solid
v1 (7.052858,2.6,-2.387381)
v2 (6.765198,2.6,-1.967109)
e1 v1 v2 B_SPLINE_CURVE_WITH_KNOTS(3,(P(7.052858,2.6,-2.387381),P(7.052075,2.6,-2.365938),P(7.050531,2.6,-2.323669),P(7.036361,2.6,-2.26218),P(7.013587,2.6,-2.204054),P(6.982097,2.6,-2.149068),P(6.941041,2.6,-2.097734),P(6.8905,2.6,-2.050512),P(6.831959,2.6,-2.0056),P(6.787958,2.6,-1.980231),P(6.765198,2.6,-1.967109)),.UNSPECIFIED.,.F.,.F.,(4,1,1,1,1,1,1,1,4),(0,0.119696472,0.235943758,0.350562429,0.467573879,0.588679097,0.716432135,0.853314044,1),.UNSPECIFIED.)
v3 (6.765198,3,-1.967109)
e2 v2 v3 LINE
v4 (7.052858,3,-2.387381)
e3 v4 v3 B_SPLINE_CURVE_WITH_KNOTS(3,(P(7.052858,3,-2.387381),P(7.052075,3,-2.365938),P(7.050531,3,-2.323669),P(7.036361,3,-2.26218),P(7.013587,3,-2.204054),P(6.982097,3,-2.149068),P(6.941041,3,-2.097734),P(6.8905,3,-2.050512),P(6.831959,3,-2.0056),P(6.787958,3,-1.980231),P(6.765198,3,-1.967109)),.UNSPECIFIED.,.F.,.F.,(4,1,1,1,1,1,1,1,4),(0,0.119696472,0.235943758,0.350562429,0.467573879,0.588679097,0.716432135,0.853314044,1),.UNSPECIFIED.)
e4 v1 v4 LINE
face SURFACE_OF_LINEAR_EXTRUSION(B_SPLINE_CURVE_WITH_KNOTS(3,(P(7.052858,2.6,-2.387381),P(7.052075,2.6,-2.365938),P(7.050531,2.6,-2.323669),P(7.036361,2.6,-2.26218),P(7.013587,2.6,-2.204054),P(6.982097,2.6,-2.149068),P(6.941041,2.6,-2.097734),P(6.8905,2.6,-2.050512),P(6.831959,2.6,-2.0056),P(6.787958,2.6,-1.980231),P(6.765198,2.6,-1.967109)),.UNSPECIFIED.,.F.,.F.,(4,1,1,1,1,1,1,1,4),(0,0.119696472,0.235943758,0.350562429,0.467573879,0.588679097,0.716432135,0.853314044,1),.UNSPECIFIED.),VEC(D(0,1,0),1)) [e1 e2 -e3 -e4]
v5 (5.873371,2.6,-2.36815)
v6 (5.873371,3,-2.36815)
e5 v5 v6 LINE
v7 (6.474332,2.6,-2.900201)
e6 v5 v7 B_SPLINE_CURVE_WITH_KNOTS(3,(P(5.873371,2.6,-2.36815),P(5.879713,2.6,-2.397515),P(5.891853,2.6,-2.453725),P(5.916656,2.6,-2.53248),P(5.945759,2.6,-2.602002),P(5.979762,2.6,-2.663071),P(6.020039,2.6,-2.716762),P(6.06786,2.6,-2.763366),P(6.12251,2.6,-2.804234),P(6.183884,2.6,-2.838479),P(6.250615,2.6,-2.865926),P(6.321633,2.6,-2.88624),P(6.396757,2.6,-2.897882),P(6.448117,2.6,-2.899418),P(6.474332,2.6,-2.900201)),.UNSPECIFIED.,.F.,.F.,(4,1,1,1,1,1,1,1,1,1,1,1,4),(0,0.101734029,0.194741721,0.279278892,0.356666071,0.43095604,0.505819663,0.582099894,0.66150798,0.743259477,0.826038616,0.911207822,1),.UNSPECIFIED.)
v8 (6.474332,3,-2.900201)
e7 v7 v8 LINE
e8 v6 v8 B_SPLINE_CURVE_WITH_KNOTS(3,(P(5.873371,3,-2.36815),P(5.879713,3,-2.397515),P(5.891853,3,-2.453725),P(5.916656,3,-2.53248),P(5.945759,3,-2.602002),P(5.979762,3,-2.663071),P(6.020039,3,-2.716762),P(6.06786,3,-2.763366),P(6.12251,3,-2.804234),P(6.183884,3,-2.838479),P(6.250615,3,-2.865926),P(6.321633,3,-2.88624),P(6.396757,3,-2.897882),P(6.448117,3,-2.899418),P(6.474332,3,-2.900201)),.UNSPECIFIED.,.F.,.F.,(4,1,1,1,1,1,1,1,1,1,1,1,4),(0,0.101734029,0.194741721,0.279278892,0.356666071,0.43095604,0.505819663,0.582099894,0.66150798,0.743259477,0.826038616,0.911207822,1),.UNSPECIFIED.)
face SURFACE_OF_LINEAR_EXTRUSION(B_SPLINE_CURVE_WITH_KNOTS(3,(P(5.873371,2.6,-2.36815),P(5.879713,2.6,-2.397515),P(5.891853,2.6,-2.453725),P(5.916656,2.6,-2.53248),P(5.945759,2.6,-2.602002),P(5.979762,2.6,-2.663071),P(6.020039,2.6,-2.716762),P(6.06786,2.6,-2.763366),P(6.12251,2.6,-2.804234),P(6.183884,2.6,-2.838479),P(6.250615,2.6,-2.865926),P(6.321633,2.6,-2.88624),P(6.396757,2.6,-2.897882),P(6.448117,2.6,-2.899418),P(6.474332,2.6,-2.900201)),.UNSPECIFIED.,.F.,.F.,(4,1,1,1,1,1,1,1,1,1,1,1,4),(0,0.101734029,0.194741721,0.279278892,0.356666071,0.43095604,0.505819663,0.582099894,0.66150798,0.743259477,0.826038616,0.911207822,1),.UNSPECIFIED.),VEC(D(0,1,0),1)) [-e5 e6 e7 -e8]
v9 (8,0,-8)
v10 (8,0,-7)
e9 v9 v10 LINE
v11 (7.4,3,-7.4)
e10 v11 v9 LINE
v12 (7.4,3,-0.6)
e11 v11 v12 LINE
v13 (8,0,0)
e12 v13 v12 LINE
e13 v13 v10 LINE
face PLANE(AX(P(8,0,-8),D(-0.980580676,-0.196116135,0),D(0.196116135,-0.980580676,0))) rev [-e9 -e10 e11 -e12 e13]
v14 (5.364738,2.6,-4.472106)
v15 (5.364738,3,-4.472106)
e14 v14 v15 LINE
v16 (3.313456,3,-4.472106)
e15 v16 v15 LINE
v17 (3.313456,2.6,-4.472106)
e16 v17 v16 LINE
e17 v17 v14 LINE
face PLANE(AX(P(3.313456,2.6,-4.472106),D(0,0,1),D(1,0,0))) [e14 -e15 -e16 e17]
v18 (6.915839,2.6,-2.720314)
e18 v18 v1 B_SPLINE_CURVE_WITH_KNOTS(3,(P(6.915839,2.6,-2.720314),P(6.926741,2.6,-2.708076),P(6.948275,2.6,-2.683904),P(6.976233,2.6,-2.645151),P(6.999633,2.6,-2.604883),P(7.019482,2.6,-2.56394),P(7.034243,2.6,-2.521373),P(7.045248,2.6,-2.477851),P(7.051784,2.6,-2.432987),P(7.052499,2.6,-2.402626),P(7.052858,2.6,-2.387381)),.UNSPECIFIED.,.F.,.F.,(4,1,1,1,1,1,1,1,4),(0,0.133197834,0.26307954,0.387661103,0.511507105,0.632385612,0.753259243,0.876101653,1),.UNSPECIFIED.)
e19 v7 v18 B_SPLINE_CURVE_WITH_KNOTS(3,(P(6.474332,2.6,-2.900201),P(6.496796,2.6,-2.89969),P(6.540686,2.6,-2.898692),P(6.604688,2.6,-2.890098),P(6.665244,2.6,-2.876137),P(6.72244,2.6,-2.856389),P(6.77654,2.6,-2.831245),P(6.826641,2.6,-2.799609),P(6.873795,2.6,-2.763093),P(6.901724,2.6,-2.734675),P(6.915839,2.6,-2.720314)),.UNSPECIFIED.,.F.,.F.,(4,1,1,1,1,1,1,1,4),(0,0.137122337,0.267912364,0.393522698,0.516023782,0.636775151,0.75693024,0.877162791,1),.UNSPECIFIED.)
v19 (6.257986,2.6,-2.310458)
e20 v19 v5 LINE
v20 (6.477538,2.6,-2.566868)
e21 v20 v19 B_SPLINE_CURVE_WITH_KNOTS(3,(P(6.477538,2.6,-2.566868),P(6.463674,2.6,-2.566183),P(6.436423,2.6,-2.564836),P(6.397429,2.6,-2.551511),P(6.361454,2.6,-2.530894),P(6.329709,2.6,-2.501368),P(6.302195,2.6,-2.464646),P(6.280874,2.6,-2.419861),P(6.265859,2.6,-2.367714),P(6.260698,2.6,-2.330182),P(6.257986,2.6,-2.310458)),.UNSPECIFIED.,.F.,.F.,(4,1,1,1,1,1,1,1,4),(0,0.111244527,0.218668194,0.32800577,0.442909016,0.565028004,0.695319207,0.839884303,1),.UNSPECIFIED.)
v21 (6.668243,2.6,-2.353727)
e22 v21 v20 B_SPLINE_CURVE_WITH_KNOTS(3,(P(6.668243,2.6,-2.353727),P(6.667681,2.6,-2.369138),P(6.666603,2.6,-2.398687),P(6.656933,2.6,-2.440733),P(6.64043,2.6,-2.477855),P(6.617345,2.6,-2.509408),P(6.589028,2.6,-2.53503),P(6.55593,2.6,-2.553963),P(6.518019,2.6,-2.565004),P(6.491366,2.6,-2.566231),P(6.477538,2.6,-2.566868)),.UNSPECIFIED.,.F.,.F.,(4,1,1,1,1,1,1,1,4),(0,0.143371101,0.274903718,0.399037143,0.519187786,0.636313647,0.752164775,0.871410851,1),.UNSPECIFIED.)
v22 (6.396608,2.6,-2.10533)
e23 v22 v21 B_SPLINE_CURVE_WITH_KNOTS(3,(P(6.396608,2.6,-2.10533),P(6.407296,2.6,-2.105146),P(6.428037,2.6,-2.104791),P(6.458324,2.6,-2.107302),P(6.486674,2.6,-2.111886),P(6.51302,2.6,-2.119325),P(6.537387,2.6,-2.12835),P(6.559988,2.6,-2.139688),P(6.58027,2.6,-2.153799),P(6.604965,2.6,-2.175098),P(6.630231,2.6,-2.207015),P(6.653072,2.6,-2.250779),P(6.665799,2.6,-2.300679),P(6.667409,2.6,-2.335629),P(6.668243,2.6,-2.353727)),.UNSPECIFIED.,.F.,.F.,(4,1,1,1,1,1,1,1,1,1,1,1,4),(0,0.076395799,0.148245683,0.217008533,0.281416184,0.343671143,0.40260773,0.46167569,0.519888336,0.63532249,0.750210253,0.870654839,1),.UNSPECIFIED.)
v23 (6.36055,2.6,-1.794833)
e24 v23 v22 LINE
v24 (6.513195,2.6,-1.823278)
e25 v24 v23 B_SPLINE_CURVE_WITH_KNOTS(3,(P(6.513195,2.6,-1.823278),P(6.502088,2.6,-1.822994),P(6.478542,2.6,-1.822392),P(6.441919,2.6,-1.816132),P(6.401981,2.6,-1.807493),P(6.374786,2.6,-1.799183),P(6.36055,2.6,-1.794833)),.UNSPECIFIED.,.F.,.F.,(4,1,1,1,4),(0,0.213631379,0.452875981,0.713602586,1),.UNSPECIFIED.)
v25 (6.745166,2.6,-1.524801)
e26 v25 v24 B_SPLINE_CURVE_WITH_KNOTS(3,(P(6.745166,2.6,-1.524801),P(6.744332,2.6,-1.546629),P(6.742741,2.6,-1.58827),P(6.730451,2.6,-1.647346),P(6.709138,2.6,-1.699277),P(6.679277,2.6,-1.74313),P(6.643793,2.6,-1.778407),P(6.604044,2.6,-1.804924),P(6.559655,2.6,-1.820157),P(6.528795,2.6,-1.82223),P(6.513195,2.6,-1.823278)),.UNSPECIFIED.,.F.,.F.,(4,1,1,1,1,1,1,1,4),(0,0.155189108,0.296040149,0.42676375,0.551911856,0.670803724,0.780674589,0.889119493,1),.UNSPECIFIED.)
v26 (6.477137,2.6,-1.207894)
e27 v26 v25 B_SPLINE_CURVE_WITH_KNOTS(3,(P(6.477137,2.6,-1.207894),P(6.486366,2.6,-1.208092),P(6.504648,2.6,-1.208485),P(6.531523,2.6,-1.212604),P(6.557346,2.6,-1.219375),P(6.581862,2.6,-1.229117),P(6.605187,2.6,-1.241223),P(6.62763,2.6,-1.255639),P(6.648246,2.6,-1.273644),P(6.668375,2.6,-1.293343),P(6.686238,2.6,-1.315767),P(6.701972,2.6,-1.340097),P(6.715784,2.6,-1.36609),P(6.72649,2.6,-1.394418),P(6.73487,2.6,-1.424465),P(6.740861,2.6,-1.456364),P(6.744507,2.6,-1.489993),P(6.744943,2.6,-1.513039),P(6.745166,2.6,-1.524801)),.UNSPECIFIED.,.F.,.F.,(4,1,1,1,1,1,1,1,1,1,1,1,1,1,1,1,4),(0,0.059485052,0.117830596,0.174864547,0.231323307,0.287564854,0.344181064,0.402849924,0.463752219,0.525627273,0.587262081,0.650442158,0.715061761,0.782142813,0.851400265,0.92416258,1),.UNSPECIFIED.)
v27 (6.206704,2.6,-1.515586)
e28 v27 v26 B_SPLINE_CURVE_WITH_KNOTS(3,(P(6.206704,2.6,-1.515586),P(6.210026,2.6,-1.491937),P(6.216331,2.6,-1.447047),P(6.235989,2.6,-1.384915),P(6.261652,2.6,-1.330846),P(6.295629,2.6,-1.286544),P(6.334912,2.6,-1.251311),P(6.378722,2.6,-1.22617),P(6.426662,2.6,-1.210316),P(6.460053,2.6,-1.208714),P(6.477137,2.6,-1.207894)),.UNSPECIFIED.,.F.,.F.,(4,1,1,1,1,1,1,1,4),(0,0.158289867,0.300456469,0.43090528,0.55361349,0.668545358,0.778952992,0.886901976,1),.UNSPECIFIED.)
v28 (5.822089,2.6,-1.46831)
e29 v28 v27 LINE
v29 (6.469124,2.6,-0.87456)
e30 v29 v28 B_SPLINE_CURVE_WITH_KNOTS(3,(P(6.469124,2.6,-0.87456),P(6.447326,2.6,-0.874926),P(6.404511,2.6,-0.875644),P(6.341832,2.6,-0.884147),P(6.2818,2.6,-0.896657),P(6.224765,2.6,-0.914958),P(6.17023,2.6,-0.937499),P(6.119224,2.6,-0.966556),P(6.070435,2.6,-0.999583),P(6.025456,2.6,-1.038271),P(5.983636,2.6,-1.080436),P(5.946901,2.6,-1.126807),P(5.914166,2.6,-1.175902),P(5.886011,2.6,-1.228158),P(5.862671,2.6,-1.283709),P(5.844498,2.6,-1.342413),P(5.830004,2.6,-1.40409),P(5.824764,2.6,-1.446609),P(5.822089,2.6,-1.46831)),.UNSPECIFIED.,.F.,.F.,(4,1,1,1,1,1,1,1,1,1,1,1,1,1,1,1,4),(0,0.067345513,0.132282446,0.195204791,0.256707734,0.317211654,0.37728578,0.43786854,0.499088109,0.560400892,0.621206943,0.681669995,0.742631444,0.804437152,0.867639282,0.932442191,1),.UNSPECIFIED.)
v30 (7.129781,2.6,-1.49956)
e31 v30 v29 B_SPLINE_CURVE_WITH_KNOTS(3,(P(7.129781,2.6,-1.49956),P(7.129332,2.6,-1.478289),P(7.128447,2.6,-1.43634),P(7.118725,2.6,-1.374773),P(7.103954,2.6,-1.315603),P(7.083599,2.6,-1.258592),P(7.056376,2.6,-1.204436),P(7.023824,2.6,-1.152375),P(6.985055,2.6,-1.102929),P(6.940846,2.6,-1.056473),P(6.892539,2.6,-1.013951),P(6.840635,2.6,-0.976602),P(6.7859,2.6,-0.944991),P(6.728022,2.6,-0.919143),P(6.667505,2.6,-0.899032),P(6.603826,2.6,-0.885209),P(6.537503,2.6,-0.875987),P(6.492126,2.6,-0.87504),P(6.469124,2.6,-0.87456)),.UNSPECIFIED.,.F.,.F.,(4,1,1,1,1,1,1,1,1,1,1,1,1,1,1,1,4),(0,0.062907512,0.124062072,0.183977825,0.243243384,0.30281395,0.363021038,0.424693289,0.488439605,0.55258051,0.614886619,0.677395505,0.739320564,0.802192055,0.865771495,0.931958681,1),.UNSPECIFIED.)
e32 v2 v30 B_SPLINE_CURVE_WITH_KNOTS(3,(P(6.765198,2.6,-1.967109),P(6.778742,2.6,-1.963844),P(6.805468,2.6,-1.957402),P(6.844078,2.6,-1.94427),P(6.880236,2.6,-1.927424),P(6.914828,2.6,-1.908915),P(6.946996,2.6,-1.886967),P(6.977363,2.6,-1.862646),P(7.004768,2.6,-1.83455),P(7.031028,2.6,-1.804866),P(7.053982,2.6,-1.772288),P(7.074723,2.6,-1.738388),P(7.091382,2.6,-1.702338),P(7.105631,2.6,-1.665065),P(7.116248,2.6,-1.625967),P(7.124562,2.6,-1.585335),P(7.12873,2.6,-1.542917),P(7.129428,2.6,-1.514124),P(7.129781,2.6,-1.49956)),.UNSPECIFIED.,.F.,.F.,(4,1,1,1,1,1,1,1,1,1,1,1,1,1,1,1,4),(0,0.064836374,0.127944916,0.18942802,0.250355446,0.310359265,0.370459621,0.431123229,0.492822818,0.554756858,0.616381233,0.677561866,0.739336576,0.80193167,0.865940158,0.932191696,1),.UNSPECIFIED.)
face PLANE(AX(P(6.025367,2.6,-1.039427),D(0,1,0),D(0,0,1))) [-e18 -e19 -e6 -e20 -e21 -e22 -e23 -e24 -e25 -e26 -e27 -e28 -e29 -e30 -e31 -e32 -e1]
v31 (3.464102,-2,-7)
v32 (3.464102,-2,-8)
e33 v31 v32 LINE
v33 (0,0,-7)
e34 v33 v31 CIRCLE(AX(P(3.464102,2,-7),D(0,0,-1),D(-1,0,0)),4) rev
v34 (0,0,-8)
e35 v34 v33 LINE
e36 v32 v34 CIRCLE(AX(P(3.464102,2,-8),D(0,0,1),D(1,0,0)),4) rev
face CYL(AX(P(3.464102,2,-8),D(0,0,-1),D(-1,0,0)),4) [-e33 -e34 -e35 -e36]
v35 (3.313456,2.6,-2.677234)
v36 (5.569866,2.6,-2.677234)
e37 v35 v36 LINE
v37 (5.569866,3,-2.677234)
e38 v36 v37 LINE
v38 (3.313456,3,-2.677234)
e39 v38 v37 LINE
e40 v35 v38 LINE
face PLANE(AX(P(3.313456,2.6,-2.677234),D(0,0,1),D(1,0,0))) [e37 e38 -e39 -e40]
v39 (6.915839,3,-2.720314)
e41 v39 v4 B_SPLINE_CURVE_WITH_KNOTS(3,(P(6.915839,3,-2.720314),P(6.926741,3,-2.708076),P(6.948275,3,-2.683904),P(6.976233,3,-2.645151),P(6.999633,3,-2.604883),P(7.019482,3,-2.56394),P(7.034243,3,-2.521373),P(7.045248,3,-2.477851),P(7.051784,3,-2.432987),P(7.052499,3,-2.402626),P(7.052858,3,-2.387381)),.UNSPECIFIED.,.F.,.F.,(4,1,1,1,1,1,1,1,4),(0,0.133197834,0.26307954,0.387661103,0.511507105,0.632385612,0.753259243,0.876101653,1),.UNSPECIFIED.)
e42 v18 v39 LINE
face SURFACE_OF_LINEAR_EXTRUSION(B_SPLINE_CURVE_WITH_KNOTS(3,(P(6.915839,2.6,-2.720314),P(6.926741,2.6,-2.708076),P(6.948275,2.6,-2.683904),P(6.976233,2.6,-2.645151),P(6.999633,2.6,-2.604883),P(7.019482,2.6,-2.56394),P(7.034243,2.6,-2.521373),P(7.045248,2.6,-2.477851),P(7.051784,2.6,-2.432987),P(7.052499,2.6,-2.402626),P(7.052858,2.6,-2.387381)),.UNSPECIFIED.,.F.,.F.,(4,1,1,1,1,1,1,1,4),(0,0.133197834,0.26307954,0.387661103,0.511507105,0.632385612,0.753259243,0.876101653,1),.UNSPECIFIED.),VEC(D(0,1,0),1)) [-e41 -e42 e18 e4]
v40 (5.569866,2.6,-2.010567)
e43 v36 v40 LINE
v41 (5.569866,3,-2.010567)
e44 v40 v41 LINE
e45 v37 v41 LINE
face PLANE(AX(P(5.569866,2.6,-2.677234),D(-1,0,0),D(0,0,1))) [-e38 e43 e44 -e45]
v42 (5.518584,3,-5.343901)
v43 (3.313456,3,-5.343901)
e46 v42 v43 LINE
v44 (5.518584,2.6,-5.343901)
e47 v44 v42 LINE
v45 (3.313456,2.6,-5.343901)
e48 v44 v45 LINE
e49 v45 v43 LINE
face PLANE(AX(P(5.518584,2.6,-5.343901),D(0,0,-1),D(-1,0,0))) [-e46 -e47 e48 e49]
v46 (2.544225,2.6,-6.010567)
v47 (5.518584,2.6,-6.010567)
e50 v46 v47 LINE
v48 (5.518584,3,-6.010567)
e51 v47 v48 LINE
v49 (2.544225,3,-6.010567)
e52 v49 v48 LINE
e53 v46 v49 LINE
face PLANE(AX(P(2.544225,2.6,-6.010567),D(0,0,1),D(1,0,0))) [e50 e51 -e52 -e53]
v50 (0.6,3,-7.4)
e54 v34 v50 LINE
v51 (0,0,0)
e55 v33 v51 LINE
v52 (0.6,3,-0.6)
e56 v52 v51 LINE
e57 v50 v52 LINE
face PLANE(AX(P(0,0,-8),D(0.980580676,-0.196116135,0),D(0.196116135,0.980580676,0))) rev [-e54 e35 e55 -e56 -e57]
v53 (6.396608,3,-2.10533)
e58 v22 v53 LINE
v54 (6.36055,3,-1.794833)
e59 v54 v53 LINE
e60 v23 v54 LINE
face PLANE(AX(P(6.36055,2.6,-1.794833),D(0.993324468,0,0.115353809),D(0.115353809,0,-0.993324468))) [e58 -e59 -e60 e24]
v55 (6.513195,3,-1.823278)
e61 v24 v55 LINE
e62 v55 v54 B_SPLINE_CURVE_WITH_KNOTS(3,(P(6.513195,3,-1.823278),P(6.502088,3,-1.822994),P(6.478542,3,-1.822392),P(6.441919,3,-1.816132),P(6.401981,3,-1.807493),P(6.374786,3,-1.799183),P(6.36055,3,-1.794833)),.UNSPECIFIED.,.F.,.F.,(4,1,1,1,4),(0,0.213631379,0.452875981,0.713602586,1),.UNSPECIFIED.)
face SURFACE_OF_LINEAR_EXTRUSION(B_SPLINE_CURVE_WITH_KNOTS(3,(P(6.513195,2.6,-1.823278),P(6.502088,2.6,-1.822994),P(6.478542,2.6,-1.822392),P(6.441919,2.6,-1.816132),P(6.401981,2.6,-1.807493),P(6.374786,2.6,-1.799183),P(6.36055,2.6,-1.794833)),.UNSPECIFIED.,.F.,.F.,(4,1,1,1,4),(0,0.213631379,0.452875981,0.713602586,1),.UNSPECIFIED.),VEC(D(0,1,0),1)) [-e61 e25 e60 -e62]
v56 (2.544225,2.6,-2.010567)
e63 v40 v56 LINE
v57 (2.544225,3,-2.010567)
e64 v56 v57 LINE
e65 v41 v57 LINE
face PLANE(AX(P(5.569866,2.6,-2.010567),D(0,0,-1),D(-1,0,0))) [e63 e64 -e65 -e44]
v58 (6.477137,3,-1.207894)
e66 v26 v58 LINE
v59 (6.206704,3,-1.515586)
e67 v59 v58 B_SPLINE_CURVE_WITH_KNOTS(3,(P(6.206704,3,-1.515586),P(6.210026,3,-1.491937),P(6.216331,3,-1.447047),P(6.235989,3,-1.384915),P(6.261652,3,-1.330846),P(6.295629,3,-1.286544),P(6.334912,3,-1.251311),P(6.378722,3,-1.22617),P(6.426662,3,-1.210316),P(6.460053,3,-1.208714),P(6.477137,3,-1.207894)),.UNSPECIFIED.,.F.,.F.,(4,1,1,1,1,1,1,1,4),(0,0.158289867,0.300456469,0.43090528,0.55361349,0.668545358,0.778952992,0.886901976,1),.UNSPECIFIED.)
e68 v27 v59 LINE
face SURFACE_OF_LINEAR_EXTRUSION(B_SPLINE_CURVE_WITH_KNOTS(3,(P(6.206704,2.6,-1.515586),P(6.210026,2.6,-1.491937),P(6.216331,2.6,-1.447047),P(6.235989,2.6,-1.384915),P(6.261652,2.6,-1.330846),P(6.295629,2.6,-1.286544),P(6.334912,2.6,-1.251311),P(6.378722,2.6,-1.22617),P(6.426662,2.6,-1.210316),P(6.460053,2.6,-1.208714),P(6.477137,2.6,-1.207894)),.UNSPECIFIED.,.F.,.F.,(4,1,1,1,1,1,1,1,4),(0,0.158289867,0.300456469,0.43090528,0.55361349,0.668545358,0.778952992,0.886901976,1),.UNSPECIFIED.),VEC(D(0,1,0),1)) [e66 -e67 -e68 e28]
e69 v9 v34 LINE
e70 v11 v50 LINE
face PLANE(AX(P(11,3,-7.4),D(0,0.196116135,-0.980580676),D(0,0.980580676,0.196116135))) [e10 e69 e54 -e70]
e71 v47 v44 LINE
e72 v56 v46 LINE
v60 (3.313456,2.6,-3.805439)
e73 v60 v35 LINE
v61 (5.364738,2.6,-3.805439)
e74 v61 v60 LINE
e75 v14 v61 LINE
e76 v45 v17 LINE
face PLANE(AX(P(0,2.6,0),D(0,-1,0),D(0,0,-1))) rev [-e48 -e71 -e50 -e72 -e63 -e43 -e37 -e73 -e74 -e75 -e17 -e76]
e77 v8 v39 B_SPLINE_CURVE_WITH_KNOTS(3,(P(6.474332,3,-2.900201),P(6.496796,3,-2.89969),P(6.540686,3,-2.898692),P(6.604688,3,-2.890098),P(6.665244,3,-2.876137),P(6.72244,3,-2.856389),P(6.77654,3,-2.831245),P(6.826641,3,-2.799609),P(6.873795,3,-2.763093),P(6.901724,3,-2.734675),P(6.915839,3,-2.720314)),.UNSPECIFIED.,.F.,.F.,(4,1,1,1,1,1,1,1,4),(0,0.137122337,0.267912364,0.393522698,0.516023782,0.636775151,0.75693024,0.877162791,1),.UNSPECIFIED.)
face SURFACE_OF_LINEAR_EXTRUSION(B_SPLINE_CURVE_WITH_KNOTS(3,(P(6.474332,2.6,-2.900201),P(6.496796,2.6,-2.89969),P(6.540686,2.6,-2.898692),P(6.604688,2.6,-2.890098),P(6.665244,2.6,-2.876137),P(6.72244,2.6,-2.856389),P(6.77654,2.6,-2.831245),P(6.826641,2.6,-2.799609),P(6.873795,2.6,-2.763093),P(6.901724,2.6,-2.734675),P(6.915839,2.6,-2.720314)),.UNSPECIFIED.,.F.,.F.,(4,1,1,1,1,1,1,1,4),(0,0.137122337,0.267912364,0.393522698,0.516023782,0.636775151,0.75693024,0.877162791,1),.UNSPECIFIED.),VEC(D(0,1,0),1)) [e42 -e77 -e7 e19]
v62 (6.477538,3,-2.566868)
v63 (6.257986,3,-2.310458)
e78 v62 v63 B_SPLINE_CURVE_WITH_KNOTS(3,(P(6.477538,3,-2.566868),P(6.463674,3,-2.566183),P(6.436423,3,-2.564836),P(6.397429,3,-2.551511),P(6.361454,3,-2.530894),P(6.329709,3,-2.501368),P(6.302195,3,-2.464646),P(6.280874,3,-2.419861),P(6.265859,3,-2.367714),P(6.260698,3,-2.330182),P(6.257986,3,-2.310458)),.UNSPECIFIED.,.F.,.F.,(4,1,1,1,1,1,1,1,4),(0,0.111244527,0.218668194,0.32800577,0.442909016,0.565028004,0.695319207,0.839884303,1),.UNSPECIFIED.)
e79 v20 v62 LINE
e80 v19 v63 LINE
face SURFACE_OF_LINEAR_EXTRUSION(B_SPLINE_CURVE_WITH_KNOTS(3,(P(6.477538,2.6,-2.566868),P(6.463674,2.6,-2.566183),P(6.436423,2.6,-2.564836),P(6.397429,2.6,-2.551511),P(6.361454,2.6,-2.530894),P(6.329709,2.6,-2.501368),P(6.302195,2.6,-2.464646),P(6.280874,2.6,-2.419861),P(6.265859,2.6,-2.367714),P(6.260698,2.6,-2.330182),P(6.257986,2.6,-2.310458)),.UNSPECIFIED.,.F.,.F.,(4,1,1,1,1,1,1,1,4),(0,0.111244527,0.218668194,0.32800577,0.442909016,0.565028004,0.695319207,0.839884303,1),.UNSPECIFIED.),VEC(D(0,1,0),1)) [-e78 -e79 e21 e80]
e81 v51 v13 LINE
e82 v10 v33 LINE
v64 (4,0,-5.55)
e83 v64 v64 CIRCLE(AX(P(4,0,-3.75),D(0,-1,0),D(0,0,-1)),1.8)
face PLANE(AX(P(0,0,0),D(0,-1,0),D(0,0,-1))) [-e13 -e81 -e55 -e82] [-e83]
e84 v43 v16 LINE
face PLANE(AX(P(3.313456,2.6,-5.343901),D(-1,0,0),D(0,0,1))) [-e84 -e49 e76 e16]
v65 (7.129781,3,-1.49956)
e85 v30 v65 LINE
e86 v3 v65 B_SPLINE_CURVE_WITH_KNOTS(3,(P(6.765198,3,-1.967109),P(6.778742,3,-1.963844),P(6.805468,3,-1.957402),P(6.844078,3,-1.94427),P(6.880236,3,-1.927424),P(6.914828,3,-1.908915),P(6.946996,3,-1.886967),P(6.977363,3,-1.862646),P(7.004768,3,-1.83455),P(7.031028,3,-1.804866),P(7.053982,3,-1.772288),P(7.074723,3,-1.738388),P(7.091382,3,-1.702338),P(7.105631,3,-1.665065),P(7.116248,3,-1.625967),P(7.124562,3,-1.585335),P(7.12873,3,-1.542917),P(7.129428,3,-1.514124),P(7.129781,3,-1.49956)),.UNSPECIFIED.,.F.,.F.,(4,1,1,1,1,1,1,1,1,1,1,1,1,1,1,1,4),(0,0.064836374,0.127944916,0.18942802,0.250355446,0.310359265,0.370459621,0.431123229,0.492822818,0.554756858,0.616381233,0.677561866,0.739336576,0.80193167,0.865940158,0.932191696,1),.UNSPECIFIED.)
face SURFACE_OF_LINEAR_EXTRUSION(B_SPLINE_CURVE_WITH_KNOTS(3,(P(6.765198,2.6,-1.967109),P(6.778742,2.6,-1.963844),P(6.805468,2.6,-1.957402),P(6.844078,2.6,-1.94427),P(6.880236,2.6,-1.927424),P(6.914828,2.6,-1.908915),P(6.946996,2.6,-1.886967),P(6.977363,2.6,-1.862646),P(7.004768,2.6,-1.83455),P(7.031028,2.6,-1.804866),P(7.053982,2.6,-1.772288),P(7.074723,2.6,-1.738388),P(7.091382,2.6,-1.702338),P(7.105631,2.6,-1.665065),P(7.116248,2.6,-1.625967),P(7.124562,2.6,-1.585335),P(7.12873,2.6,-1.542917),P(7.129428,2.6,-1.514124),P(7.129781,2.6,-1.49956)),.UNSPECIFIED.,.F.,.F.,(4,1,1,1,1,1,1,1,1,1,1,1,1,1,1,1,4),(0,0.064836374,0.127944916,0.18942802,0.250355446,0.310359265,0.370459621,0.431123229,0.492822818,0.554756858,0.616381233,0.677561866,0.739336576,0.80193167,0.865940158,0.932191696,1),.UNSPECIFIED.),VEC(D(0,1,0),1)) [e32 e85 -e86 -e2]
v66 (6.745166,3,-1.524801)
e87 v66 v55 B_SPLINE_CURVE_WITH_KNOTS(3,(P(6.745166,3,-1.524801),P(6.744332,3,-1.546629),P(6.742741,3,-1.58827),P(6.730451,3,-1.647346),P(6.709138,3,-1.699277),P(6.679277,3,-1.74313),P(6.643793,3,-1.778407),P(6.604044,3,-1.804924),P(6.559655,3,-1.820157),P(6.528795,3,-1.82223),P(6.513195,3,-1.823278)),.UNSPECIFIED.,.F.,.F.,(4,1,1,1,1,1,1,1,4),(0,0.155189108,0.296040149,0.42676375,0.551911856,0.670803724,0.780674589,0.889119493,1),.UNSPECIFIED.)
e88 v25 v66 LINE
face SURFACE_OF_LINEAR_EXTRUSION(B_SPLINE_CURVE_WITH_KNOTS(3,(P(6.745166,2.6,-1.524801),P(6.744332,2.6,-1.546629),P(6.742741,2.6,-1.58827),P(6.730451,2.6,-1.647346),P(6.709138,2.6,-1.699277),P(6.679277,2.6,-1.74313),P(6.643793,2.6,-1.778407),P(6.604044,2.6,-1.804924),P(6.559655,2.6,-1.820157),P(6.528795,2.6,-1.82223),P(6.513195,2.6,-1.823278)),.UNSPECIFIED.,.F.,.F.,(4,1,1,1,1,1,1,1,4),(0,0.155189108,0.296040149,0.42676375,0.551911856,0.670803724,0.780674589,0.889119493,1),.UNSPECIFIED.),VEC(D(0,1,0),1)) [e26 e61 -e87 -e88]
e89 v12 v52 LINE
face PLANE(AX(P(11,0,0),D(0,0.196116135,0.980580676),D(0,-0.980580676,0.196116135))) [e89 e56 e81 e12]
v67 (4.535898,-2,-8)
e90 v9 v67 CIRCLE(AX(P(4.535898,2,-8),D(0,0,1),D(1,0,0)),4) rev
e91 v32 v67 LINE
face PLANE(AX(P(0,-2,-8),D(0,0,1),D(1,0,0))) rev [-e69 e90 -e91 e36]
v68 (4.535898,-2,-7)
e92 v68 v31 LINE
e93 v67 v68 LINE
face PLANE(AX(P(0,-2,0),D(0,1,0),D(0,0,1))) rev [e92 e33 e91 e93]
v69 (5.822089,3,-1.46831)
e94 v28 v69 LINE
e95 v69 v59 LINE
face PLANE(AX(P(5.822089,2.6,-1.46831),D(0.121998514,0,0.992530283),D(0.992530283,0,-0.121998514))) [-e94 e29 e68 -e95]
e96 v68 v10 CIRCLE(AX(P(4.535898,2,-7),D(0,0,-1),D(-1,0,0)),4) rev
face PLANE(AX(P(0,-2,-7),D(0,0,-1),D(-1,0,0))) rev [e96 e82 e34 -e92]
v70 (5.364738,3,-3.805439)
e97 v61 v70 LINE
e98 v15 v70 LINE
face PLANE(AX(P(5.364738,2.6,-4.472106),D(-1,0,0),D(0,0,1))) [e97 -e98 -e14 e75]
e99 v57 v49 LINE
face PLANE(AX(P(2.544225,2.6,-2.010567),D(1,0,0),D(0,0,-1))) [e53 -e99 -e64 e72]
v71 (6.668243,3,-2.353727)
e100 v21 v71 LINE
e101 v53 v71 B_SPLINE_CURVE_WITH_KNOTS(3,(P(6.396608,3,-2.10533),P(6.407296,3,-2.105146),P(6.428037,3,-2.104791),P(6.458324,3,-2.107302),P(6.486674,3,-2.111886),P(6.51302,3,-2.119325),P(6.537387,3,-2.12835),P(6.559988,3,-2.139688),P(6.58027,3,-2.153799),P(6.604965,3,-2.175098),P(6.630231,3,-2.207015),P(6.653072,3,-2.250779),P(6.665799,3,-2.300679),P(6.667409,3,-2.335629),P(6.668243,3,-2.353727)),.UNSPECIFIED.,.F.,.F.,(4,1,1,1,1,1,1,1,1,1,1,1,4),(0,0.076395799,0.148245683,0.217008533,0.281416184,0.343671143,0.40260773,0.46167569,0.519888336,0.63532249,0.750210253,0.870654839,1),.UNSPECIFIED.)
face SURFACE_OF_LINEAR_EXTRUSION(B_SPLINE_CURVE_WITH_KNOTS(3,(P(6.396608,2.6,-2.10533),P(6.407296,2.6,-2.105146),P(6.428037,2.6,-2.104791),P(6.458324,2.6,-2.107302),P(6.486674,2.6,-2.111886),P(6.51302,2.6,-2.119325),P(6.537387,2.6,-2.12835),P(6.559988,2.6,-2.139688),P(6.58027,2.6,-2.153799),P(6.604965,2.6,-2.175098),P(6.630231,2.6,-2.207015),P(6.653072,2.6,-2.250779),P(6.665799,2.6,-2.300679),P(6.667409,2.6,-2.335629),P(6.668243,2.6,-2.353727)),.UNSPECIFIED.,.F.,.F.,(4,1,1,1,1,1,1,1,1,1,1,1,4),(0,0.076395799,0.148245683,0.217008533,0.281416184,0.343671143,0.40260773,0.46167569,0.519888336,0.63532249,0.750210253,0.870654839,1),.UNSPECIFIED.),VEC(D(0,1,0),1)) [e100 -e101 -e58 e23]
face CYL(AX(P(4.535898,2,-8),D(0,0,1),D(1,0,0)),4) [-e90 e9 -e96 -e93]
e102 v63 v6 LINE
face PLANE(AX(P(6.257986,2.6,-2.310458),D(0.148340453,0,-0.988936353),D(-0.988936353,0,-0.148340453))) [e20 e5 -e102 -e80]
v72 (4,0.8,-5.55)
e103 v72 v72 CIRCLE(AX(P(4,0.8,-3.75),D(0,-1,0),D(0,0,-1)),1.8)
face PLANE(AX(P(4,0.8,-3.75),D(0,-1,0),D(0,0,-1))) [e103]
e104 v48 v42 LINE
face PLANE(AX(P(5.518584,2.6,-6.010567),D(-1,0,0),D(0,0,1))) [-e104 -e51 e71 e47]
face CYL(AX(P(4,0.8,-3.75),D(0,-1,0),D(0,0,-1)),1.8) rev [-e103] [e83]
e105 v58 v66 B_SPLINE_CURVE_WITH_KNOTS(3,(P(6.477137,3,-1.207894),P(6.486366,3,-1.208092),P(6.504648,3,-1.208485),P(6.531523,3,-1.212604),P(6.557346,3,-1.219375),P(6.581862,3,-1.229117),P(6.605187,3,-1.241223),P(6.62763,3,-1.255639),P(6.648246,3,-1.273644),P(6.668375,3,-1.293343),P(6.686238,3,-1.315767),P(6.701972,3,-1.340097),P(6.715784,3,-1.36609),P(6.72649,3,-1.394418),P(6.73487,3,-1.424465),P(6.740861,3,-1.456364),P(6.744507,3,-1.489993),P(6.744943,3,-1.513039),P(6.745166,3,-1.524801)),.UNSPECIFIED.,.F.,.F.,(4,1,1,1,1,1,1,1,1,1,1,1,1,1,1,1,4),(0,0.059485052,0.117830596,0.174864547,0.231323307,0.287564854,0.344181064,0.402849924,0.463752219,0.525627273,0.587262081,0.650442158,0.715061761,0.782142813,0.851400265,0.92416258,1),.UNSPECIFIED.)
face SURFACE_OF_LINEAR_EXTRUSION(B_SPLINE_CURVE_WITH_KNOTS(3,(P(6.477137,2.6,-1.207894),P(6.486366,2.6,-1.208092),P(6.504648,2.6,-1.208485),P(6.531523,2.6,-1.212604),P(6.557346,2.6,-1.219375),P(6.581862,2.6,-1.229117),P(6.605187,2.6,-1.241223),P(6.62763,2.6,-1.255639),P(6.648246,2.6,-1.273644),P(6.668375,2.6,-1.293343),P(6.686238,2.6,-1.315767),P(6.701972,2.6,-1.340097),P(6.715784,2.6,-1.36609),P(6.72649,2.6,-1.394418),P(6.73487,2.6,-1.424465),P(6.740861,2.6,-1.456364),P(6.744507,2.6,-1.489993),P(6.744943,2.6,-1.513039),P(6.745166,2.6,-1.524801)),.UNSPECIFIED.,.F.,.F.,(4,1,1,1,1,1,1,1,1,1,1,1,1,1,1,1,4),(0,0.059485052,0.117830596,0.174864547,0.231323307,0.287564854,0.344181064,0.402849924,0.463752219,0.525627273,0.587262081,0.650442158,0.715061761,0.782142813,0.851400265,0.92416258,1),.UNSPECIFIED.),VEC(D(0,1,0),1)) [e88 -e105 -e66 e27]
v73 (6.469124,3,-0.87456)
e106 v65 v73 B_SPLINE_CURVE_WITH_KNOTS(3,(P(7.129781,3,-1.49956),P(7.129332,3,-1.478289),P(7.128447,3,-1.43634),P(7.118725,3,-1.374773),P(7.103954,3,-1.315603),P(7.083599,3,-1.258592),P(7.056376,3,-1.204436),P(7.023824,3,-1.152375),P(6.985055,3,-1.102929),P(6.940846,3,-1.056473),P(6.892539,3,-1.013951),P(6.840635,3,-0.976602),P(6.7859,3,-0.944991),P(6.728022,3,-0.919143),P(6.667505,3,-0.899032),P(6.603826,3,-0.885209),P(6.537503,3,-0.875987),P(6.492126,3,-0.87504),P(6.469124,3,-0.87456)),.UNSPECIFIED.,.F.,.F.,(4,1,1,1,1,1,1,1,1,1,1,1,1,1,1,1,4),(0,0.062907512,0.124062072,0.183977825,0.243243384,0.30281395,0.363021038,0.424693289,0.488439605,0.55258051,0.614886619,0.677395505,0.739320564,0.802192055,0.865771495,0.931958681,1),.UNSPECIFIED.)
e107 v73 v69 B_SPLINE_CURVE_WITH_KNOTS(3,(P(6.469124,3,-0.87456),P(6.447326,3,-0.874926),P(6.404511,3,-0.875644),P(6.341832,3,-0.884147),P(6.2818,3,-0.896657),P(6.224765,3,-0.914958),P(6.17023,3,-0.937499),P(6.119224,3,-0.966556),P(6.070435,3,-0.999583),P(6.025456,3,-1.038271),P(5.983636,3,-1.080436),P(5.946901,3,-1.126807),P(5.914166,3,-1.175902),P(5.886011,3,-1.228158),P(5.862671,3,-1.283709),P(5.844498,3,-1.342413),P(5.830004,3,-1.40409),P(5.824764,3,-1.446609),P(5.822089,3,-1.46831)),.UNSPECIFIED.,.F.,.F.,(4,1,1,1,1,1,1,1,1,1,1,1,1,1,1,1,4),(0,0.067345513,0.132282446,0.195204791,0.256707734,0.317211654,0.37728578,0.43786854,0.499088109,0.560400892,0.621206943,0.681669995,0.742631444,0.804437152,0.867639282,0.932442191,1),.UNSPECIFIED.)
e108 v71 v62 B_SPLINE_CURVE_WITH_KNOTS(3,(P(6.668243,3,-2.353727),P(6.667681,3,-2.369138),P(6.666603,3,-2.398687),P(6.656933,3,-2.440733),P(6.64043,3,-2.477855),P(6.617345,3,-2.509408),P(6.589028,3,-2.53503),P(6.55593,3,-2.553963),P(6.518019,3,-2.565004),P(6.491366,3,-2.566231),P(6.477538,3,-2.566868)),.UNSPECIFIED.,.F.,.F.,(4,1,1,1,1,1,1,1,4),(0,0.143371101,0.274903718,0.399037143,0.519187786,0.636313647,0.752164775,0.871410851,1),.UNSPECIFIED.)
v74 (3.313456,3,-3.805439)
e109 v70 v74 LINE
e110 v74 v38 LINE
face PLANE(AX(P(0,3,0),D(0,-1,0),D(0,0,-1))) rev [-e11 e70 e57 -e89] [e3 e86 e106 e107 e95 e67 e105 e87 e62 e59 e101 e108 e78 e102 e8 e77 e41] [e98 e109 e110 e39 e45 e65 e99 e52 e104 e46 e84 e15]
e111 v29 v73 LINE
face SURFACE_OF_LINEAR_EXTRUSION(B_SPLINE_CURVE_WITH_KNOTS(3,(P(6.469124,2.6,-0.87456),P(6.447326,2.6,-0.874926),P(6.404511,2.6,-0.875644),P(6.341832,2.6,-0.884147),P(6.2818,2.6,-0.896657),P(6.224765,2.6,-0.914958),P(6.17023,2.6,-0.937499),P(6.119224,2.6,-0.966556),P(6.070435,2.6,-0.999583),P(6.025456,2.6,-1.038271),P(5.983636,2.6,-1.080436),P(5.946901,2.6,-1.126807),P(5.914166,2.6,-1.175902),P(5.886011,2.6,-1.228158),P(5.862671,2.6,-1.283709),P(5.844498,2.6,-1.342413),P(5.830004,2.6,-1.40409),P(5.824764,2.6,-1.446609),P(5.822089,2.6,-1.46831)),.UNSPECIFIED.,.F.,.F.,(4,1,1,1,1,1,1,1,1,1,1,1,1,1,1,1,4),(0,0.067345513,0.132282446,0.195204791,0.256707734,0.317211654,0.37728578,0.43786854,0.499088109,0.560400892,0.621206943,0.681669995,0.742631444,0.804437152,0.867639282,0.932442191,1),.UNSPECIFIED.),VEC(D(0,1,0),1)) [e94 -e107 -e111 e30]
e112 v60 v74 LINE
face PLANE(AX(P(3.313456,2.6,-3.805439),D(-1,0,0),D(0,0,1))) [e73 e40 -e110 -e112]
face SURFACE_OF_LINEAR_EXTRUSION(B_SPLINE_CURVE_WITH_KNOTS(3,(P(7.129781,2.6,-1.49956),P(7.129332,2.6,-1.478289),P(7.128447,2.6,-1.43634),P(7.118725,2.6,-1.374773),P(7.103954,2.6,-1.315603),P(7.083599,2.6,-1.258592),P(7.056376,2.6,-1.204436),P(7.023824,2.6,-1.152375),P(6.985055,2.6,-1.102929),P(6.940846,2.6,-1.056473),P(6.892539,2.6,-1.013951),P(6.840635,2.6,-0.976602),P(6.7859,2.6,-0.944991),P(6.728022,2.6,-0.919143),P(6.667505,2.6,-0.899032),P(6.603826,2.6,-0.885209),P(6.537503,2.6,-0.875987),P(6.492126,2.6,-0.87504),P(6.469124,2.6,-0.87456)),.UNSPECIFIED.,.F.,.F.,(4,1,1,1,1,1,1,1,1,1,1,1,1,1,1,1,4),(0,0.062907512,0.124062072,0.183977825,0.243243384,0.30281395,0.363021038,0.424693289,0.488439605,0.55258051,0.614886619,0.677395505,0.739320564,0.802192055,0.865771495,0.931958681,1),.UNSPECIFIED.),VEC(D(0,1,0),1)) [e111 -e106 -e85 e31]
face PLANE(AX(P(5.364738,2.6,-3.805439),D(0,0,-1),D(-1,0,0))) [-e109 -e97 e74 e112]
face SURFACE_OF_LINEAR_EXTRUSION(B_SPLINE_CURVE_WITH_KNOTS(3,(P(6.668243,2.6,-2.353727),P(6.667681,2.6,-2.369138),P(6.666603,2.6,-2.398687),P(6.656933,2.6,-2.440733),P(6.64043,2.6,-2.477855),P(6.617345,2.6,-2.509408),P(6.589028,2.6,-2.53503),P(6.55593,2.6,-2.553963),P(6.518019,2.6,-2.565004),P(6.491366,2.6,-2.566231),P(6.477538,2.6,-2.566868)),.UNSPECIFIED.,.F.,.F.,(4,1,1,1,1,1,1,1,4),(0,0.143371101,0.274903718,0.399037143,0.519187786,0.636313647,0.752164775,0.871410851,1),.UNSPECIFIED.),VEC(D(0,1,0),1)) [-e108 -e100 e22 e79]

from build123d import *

# Parameters (mm, degrees)
SKETCH1_W               = 8
SKETCH1_H               = 8
BOSS_EXTRUDE1_DEPTH     = 3
CUT_EXTRUDE1_DEPTH      = 12.704699911
CUT_EXTRUDE1_DEPTH_BACK = 12.704699911
CUT_EXTRUDE2_DEPTH      = 11
SKETCH4_R               = 1.8
CUT_EXTRUDE3_DEPTH      = 0.8
SKETCH5_W               = 8
SKETCH5_H               = 1
BOSS_EXTRUDE2_DEPTH     = 2
FILLET1_R               = 4
CUT_EXTRUDE4_DEPTH      = 0.4
CUT_EXTRUDE5_DEPTH      = 0.4


with BuildPart() as part:
    # Sketch1 → Boss-Extrude1 (new body)
    with BuildSketch(Plane(origin=(0, 0, 0), x_dir=(1, 0, 0), z_dir=(0, 1, 0))):
        with Locations((4, 4)):
            Rectangle(SKETCH1_W, SKETCH1_H)
    extrude(amount=BOSS_EXTRUDE1_DEPTH)

    # Sketch2 → Cut-Extrude1 (cut, two sides: drawn at the far end of the back side and taken through both)
    with BuildSketch(Plane.XY.offset(-CUT_EXTRUDE1_DEPTH_BACK)):
        Polygon((0, 0), (0.6, 3), (0, 3), align=None)
        Polygon((8, 0), (7.4, 3), (8, 3), align=None)
    extrude(amount=CUT_EXTRUDE1_DEPTH + CUT_EXTRUDE1_DEPTH_BACK, mode=Mode.SUBTRACT)

    # Sketch3 → Cut-Extrude2 (cut)
    with BuildSketch(Plane(origin=(0, 0, 0), x_dir=(0, 0, -1), z_dir=(1, 0, 0))):
        Polygon((0, 0), (0.6, 3), (0, 3), align=None)
        Polygon((8, 3), (7.4, 3), (8, 0), align=None)
    extrude(amount=CUT_EXTRUDE2_DEPTH, mode=Mode.SUBTRACT)

    # Sketch4 → Cut-Extrude3 (cut)
    with BuildSketch(Plane.XZ):
        with Locations(Location((4, -3.75, 0), (0, 0, 270))):
            Circle(SKETCH4_R)
    extrude(amount=-CUT_EXTRUDE3_DEPTH, mode=Mode.SUBTRACT)

    # Sketch5 → Boss-Extrude2 (add)
    with BuildSketch(Plane.XZ):
        with Locations((4, -7.5)):
            Rectangle(SKETCH5_W, SKETCH5_H)
    extrude(amount=BOSS_EXTRUDE2_DEPTH)

    # Fillet1
    # the kernel refuses this fillet: 4 mm, written as the material it takes off along each edge
    with BuildSketch(Plane(origin=(8, -2, -16.660254038), x_dir=(0, 1, 0), z_dir=(0, 0, 1)), Plane(origin=(0, -2, 1.660254038), x_dir=(0, 1, 0), z_dir=(0, 0, -1))) as fillet1_piece_1:
        with BuildLine():
            CenterArc((4, 3.464101615), FILLET1_R, 180, 60)
            Line((0, 3.464101615), (-0.08, 3.464101615))
            Line((-0.08, 3.464101615), (-0.08, 0))
            Line((-0.08, 0), (0, -0.08))
            ThreePointArc((0, -0.08), (1, -0.08), (1.96, -0.069282032))
            Line((1.96, -0.069282032), (2, 0))
        make_face()
    extrude(amount=18.320508076, mode=Mode.SUBTRACT)

    # Sketch6 → Cut-Extrude4 (cut)
    with BuildSketch(Plane(origin=(0, 3, 0), x_dir=(1, 0, 0), z_dir=(0, 1, 0))):
        Polygon((2.544225106, 2.010567225), (2.544225106, 6.010567225), (5.51858408, 6.010567225), (5.51858408, 5.343900558), (3.313455875, 5.343900558), (3.313455875, 4.472105686), (5.364737926, 4.472105686), (5.364737926, 3.80543902), (3.313455875, 3.80543902), (3.313455875, 2.677233891), (5.569866131, 2.677233891), (5.569866131, 2.010567225), align=None)
    extrude(amount=-CUT_EXTRUDE4_DEPTH, mode=Mode.SUBTRACT)

    # Sketch7 → Cut-Extrude5 (cut)
    with BuildSketch(Plane(origin=(0, 3, 0), x_dir=(1, 0, 0), z_dir=(0, 1, 0))):
        with BuildLine():
            Line((5.822088817, 1.468310464), (6.206704202, 1.515586105))
            add(Edge.make_bspline(
                [(6.206704202, 1.515586105), (6.210025755, 1.491936921), (6.21633053, 1.447047438), (6.235989072, 1.384914698), (6.261652315, 1.330845836), (6.295629161, 1.286544364), (6.334912115, 1.251310519), (6.37872169, 1.226169889), (6.426661607, 1.210315729), (6.460052531, 1.208713548), (6.477136894, 1.207893797)],
                knots=[0, 0, 0, 0, 1.26631894, 2.403651751, 3.447242243, 4.428907923, 5.348362865, 6.231623936, 7.095215805, 8, 8, 8, 8], degree=3))
            add(Edge.make_bspline(
                [(6.477136894, 1.207893797), (6.486366298, 1.208091994), (6.504648304, 1.20848459), (6.531523321, 1.212603697), (6.557345996, 1.219374529), (6.58186155, 1.229117251), (6.605187017, 1.241222715), (6.627629553, 1.255638676), (6.648246393, 1.273643613), (6.668375088, 1.29334292), (6.68623752, 1.315767324), (6.701972196, 1.340096861), (6.715784117, 1.366090219), (6.726489771, 1.394417604), (6.734869896, 1.424465406), (6.740860884, 1.456364057), (6.744506994, 1.489993317), (6.74494315, 1.513039367), (6.74516574, 1.524800849)],
                knots=[0, 0, 0, 0, 0.951760839, 1.885289532, 2.797832748, 3.70117291, 4.60103766, 5.506897018, 6.445598779, 7.420035506, 8.410036365, 9.396193293, 10.407074535, 11.440988179, 12.514285005, 13.622404236, 14.786601276, 16, 16, 16, 16], degree=3))
            add(Edge.make_bspline(
                [(6.74516574, 1.524800849), (6.744331981, 1.546629456), (6.742741494, 1.588269906), (6.730451294, 1.647346431), (6.709137892, 1.699277092), (6.679276772, 1.743130281), (6.643793264, 1.778406879), (6.604044422, 1.8049236), (6.559654571, 1.820157256), (6.528795478, 1.822230353), (6.513194586, 1.823278413)],
                knots=[0, 0, 0, 0, 1.241512862, 2.368321189, 3.414110003, 4.41529485, 5.36642979, 6.245396713, 7.112955941, 8, 8, 8, 8], degree=3))
            add(Edge.make_bspline(
                [(6.513194586, 1.823278413), (6.502087722, 1.822994208), (6.47854234, 1.822391724), (6.441918774, 1.81613185), (6.401980616, 1.80749294), (6.374785766, 1.799182881), (6.360550356, 1.7948329)],
                knots=[0, 0, 0, 0, 0.854525515, 1.811503923, 2.854410343, 4, 4, 4, 4], degree=3))
            Line((6.360550356, 1.7948329), (6.396608048, 2.105329695))
            add(Edge.make_bspline(
                [(6.396608048, 2.105329695), (6.407296254, 2.105146348), (6.428036665, 2.104790564), (6.458323888, 2.107301653), (6.486673662, 2.111886341), (6.513019839, 2.119324972), (6.53738695, 2.128349551), (6.559988104, 2.139688262), (6.580270378, 2.153798702), (6.604965361, 2.175098338), (6.630230561, 2.207014566), (6.6530719, 2.250778884), (6.665798637, 2.300679459), (6.667408863, 2.335629458), (6.668242663, 2.353727131)],
                knots=[0, 0, 0, 0, 0.916749589, 1.778948191, 2.604102396, 3.376994206, 4.124053722, 4.831292757, 5.54010828, 6.238660037, 7.62386988, 9.002523041, 10.447858069, 12, 12, 12, 12], degree=3))
            add(Edge.make_bspline(
                [(6.668242663, 2.353727131), (6.667680515, 2.36913782), (6.666602635, 2.398686702), (6.656933325, 2.440733393), (6.640429824, 2.477855418), (6.617345194, 2.50940841), (6.589028098, 2.535030406), (6.555929861, 2.553963194), (6.518019093, 2.565003531), (6.491366313, 2.566231188), (6.477537535, 2.566868156)],
                knots=[0, 0, 0, 0, 1.146968804, 2.199229744, 3.192297141, 4.153502289, 5.090509175, 6.0173182, 6.971286811, 8, 8, 8, 8], degree=3))
            add(Edge.make_bspline(
                [(6.477537535, 2.566868156), (6.463673911, 2.566182836), (6.436422829, 2.564835732), (6.397428508, 2.551510744), (6.361454157, 2.530893795), (6.329709376, 2.501368407), (6.302195486, 2.464646404), (6.280874208, 2.419861118), (6.265858745, 2.367714197), (6.260698213, 2.33018187), (6.257986253, 2.3104579)],
                knots=[0, 0, 0, 0, 0.889956214, 1.749345552, 2.62404616, 3.543272128, 4.520224035, 5.562553653, 6.719074424, 8, 8, 8, 8], degree=3))
            Line((6.257986253, 2.3104579), (5.873370869, 2.368150208))
            add(Edge.make_bspline(
                [(5.873370869, 2.368150208), (5.879712758, 2.397514751), (5.891852554, 2.453725064), (5.916656, 2.532479948), (5.945759151, 2.602002338), (5.979761878, 2.663071325), (6.020038823, 2.716762155), (6.067859884, 2.763365742), (6.122509575, 2.804234412), (6.183883545, 2.838478774), (6.250614825, 2.865925856), (6.321633047, 2.886240153), (6.396757082, 2.897882068), (6.448117417, 2.899417689), (6.474332407, 2.90020149)],
                knots=[0, 0, 0, 0, 1.220808349, 2.336900656, 3.3513467, 4.279992853, 5.171472476, 6.069835959, 6.985198729, 7.938095762, 8.919113729, 9.91246339, 10.934493858, 12, 12, 12, 12], degree=3))
            add(Edge.make_bspline(
                [(6.474332407, 2.90020149), (6.496795991, 2.899690329), (6.540685792, 2.898691614), (6.604687523, 2.890097866), (6.665244055, 2.876137228), (6.722439804, 2.856388937), (6.776539911, 2.831244798), (6.826641223, 2.799609265), (6.873794781, 2.763093379), (6.901724377, 2.73467508), (6.915838817, 2.720313669)],
                knots=[0, 0, 0, 0, 1.096978699, 2.143298912, 3.148181587, 4.128190255, 5.094201205, 6.055441919, 7.017302331, 8, 8, 8, 8], degree=3))
            add(Edge.make_bspline(
                [(6.915838817, 2.720313669), (6.926741328, 2.708075606), (6.948274918, 2.683904162), (6.976233385, 2.645150995), (6.999633117, 2.604882958), (7.019482141, 2.563940258), (7.034243104, 2.52137348), (7.04524752, 2.477850813), (7.051783755, 2.43298662), (7.05249893, 2.402626167), (7.052858048, 2.387380977)],
                knots=[0, 0, 0, 0, 1.065582675, 2.104636323, 3.101288825, 4.092056841, 5.059084899, 6.026073946, 7.008813224, 8, 8, 8, 8], degree=3))
            add(Edge.make_bspline(
                [(7.052858048, 2.387380977), (7.052074688, 2.365937591), (7.050530541, 2.323668734), (7.036361111, 2.262180096), (7.013586987, 2.204054017), (6.982096895, 2.149068456), (6.941041129, 2.097733658), (6.890499978, 2.050511525), (6.831958555, 2.005600039), (6.787958464, 1.980231405), (6.765197792, 1.967108541)],
                knots=[0, 0, 0, 0, 0.957571776, 1.887550067, 2.804499428, 3.740591036, 4.709432777, 5.731457079, 6.826512349, 8, 8, 8, 8], degree=3))
            add(Edge.make_bspline(
                [(6.765197792, 1.967108541), (6.778741549, 1.963844189), (6.805468134, 1.957402478), (6.844077906, 1.94426987), (6.880236126, 1.927424278), (6.914828375, 1.908914943), (6.946996208, 1.886966635), (6.977363151, 1.862646466), (7.00476785, 1.834549826), (7.03102769, 1.804865641), (7.053982146, 1.772288453), (7.074722978, 1.738388398), (7.091382436, 1.702338355), (7.105631297, 1.665065232), (7.116248441, 1.625966572), (7.124562393, 1.585334894), (7.128729622, 1.542917296), (7.129427921, 1.514124194), (7.129781125, 1.499560464)],
                knots=[0, 0, 0, 0, 1.037381978, 2.047118658, 3.030848314, 4.005687143, 4.965748246, 5.927353932, 6.897971669, 7.885165084, 8.876109723, 9.862099733, 10.840989857, 11.829385213, 12.830906716, 13.855042526, 14.915067134, 16, 16, 16, 16], degree=3))
            add(Edge.make_bspline(
                [(7.129781125, 1.499560464), (7.129332308, 1.478289376), (7.12844718, 1.43633993), (7.11872513, 1.374773186), (7.10395436, 1.3156035), (7.083598929, 1.25859183), (7.056376257, 1.204435717), (7.023823759, 1.152375398), (6.985054773, 1.102929453), (6.940845684, 1.056472589), (6.892539484, 1.013951446), (6.84063463, 0.97660242), (6.785900139, 0.944991177), (6.728022396, 0.9191431), (6.667504686, 0.899031537), (6.603826037, 0.885208987), (6.537502989, 0.875987213), (6.49212598, 0.875040406), (6.469124074, 0.874560464)],
                knots=[0, 0, 0, 0, 1.006520189, 1.984993146, 2.943645202, 3.891894145, 4.845023195, 5.808336607, 6.795092628, 7.815033679, 8.841288157, 9.838185905, 10.83832808, 11.829129029, 12.835072876, 13.85234392, 14.911338897, 16, 16, 16, 16], degree=3))
            add(Edge.make_bspline(
                [(6.469124074, 0.874560464), (6.447326457, 0.874925903), (6.404510806, 0.875643711), (6.341832261, 0.884147308), (6.281800208, 0.896657101), (6.224765045, 0.914957582), (6.170229951, 0.937498647), (6.119224255, 0.966556317), (6.070434994, 0.999582769), (6.02545616, 1.03827062), (5.983635573, 1.080436419), (5.946901196, 1.126807021), (5.914165969, 1.175902437), (5.886010541, 1.228157933), (5.862670856, 1.283709297), (5.844497682, 1.342413141), (5.830004226, 1.404089696), (5.824763645, 1.446608551), (5.822088817, 1.468310464)],
                knots=[0, 0, 0, 0, 1.077528213, 2.11651914, 3.123276654, 4.10732375, 5.075386463, 6.036572488, 7.005896639, 7.98540975, 8.966414275, 9.939311093, 10.906719916, 11.882103104, 12.870994428, 13.882228509, 14.919075059, 16, 16, 16, 16], degree=3))
        make_face()
    extrude(amount=-CUT_EXTRUDE5_DEPTH, mode=Mode.SUBTRACT)


solid = part.part
